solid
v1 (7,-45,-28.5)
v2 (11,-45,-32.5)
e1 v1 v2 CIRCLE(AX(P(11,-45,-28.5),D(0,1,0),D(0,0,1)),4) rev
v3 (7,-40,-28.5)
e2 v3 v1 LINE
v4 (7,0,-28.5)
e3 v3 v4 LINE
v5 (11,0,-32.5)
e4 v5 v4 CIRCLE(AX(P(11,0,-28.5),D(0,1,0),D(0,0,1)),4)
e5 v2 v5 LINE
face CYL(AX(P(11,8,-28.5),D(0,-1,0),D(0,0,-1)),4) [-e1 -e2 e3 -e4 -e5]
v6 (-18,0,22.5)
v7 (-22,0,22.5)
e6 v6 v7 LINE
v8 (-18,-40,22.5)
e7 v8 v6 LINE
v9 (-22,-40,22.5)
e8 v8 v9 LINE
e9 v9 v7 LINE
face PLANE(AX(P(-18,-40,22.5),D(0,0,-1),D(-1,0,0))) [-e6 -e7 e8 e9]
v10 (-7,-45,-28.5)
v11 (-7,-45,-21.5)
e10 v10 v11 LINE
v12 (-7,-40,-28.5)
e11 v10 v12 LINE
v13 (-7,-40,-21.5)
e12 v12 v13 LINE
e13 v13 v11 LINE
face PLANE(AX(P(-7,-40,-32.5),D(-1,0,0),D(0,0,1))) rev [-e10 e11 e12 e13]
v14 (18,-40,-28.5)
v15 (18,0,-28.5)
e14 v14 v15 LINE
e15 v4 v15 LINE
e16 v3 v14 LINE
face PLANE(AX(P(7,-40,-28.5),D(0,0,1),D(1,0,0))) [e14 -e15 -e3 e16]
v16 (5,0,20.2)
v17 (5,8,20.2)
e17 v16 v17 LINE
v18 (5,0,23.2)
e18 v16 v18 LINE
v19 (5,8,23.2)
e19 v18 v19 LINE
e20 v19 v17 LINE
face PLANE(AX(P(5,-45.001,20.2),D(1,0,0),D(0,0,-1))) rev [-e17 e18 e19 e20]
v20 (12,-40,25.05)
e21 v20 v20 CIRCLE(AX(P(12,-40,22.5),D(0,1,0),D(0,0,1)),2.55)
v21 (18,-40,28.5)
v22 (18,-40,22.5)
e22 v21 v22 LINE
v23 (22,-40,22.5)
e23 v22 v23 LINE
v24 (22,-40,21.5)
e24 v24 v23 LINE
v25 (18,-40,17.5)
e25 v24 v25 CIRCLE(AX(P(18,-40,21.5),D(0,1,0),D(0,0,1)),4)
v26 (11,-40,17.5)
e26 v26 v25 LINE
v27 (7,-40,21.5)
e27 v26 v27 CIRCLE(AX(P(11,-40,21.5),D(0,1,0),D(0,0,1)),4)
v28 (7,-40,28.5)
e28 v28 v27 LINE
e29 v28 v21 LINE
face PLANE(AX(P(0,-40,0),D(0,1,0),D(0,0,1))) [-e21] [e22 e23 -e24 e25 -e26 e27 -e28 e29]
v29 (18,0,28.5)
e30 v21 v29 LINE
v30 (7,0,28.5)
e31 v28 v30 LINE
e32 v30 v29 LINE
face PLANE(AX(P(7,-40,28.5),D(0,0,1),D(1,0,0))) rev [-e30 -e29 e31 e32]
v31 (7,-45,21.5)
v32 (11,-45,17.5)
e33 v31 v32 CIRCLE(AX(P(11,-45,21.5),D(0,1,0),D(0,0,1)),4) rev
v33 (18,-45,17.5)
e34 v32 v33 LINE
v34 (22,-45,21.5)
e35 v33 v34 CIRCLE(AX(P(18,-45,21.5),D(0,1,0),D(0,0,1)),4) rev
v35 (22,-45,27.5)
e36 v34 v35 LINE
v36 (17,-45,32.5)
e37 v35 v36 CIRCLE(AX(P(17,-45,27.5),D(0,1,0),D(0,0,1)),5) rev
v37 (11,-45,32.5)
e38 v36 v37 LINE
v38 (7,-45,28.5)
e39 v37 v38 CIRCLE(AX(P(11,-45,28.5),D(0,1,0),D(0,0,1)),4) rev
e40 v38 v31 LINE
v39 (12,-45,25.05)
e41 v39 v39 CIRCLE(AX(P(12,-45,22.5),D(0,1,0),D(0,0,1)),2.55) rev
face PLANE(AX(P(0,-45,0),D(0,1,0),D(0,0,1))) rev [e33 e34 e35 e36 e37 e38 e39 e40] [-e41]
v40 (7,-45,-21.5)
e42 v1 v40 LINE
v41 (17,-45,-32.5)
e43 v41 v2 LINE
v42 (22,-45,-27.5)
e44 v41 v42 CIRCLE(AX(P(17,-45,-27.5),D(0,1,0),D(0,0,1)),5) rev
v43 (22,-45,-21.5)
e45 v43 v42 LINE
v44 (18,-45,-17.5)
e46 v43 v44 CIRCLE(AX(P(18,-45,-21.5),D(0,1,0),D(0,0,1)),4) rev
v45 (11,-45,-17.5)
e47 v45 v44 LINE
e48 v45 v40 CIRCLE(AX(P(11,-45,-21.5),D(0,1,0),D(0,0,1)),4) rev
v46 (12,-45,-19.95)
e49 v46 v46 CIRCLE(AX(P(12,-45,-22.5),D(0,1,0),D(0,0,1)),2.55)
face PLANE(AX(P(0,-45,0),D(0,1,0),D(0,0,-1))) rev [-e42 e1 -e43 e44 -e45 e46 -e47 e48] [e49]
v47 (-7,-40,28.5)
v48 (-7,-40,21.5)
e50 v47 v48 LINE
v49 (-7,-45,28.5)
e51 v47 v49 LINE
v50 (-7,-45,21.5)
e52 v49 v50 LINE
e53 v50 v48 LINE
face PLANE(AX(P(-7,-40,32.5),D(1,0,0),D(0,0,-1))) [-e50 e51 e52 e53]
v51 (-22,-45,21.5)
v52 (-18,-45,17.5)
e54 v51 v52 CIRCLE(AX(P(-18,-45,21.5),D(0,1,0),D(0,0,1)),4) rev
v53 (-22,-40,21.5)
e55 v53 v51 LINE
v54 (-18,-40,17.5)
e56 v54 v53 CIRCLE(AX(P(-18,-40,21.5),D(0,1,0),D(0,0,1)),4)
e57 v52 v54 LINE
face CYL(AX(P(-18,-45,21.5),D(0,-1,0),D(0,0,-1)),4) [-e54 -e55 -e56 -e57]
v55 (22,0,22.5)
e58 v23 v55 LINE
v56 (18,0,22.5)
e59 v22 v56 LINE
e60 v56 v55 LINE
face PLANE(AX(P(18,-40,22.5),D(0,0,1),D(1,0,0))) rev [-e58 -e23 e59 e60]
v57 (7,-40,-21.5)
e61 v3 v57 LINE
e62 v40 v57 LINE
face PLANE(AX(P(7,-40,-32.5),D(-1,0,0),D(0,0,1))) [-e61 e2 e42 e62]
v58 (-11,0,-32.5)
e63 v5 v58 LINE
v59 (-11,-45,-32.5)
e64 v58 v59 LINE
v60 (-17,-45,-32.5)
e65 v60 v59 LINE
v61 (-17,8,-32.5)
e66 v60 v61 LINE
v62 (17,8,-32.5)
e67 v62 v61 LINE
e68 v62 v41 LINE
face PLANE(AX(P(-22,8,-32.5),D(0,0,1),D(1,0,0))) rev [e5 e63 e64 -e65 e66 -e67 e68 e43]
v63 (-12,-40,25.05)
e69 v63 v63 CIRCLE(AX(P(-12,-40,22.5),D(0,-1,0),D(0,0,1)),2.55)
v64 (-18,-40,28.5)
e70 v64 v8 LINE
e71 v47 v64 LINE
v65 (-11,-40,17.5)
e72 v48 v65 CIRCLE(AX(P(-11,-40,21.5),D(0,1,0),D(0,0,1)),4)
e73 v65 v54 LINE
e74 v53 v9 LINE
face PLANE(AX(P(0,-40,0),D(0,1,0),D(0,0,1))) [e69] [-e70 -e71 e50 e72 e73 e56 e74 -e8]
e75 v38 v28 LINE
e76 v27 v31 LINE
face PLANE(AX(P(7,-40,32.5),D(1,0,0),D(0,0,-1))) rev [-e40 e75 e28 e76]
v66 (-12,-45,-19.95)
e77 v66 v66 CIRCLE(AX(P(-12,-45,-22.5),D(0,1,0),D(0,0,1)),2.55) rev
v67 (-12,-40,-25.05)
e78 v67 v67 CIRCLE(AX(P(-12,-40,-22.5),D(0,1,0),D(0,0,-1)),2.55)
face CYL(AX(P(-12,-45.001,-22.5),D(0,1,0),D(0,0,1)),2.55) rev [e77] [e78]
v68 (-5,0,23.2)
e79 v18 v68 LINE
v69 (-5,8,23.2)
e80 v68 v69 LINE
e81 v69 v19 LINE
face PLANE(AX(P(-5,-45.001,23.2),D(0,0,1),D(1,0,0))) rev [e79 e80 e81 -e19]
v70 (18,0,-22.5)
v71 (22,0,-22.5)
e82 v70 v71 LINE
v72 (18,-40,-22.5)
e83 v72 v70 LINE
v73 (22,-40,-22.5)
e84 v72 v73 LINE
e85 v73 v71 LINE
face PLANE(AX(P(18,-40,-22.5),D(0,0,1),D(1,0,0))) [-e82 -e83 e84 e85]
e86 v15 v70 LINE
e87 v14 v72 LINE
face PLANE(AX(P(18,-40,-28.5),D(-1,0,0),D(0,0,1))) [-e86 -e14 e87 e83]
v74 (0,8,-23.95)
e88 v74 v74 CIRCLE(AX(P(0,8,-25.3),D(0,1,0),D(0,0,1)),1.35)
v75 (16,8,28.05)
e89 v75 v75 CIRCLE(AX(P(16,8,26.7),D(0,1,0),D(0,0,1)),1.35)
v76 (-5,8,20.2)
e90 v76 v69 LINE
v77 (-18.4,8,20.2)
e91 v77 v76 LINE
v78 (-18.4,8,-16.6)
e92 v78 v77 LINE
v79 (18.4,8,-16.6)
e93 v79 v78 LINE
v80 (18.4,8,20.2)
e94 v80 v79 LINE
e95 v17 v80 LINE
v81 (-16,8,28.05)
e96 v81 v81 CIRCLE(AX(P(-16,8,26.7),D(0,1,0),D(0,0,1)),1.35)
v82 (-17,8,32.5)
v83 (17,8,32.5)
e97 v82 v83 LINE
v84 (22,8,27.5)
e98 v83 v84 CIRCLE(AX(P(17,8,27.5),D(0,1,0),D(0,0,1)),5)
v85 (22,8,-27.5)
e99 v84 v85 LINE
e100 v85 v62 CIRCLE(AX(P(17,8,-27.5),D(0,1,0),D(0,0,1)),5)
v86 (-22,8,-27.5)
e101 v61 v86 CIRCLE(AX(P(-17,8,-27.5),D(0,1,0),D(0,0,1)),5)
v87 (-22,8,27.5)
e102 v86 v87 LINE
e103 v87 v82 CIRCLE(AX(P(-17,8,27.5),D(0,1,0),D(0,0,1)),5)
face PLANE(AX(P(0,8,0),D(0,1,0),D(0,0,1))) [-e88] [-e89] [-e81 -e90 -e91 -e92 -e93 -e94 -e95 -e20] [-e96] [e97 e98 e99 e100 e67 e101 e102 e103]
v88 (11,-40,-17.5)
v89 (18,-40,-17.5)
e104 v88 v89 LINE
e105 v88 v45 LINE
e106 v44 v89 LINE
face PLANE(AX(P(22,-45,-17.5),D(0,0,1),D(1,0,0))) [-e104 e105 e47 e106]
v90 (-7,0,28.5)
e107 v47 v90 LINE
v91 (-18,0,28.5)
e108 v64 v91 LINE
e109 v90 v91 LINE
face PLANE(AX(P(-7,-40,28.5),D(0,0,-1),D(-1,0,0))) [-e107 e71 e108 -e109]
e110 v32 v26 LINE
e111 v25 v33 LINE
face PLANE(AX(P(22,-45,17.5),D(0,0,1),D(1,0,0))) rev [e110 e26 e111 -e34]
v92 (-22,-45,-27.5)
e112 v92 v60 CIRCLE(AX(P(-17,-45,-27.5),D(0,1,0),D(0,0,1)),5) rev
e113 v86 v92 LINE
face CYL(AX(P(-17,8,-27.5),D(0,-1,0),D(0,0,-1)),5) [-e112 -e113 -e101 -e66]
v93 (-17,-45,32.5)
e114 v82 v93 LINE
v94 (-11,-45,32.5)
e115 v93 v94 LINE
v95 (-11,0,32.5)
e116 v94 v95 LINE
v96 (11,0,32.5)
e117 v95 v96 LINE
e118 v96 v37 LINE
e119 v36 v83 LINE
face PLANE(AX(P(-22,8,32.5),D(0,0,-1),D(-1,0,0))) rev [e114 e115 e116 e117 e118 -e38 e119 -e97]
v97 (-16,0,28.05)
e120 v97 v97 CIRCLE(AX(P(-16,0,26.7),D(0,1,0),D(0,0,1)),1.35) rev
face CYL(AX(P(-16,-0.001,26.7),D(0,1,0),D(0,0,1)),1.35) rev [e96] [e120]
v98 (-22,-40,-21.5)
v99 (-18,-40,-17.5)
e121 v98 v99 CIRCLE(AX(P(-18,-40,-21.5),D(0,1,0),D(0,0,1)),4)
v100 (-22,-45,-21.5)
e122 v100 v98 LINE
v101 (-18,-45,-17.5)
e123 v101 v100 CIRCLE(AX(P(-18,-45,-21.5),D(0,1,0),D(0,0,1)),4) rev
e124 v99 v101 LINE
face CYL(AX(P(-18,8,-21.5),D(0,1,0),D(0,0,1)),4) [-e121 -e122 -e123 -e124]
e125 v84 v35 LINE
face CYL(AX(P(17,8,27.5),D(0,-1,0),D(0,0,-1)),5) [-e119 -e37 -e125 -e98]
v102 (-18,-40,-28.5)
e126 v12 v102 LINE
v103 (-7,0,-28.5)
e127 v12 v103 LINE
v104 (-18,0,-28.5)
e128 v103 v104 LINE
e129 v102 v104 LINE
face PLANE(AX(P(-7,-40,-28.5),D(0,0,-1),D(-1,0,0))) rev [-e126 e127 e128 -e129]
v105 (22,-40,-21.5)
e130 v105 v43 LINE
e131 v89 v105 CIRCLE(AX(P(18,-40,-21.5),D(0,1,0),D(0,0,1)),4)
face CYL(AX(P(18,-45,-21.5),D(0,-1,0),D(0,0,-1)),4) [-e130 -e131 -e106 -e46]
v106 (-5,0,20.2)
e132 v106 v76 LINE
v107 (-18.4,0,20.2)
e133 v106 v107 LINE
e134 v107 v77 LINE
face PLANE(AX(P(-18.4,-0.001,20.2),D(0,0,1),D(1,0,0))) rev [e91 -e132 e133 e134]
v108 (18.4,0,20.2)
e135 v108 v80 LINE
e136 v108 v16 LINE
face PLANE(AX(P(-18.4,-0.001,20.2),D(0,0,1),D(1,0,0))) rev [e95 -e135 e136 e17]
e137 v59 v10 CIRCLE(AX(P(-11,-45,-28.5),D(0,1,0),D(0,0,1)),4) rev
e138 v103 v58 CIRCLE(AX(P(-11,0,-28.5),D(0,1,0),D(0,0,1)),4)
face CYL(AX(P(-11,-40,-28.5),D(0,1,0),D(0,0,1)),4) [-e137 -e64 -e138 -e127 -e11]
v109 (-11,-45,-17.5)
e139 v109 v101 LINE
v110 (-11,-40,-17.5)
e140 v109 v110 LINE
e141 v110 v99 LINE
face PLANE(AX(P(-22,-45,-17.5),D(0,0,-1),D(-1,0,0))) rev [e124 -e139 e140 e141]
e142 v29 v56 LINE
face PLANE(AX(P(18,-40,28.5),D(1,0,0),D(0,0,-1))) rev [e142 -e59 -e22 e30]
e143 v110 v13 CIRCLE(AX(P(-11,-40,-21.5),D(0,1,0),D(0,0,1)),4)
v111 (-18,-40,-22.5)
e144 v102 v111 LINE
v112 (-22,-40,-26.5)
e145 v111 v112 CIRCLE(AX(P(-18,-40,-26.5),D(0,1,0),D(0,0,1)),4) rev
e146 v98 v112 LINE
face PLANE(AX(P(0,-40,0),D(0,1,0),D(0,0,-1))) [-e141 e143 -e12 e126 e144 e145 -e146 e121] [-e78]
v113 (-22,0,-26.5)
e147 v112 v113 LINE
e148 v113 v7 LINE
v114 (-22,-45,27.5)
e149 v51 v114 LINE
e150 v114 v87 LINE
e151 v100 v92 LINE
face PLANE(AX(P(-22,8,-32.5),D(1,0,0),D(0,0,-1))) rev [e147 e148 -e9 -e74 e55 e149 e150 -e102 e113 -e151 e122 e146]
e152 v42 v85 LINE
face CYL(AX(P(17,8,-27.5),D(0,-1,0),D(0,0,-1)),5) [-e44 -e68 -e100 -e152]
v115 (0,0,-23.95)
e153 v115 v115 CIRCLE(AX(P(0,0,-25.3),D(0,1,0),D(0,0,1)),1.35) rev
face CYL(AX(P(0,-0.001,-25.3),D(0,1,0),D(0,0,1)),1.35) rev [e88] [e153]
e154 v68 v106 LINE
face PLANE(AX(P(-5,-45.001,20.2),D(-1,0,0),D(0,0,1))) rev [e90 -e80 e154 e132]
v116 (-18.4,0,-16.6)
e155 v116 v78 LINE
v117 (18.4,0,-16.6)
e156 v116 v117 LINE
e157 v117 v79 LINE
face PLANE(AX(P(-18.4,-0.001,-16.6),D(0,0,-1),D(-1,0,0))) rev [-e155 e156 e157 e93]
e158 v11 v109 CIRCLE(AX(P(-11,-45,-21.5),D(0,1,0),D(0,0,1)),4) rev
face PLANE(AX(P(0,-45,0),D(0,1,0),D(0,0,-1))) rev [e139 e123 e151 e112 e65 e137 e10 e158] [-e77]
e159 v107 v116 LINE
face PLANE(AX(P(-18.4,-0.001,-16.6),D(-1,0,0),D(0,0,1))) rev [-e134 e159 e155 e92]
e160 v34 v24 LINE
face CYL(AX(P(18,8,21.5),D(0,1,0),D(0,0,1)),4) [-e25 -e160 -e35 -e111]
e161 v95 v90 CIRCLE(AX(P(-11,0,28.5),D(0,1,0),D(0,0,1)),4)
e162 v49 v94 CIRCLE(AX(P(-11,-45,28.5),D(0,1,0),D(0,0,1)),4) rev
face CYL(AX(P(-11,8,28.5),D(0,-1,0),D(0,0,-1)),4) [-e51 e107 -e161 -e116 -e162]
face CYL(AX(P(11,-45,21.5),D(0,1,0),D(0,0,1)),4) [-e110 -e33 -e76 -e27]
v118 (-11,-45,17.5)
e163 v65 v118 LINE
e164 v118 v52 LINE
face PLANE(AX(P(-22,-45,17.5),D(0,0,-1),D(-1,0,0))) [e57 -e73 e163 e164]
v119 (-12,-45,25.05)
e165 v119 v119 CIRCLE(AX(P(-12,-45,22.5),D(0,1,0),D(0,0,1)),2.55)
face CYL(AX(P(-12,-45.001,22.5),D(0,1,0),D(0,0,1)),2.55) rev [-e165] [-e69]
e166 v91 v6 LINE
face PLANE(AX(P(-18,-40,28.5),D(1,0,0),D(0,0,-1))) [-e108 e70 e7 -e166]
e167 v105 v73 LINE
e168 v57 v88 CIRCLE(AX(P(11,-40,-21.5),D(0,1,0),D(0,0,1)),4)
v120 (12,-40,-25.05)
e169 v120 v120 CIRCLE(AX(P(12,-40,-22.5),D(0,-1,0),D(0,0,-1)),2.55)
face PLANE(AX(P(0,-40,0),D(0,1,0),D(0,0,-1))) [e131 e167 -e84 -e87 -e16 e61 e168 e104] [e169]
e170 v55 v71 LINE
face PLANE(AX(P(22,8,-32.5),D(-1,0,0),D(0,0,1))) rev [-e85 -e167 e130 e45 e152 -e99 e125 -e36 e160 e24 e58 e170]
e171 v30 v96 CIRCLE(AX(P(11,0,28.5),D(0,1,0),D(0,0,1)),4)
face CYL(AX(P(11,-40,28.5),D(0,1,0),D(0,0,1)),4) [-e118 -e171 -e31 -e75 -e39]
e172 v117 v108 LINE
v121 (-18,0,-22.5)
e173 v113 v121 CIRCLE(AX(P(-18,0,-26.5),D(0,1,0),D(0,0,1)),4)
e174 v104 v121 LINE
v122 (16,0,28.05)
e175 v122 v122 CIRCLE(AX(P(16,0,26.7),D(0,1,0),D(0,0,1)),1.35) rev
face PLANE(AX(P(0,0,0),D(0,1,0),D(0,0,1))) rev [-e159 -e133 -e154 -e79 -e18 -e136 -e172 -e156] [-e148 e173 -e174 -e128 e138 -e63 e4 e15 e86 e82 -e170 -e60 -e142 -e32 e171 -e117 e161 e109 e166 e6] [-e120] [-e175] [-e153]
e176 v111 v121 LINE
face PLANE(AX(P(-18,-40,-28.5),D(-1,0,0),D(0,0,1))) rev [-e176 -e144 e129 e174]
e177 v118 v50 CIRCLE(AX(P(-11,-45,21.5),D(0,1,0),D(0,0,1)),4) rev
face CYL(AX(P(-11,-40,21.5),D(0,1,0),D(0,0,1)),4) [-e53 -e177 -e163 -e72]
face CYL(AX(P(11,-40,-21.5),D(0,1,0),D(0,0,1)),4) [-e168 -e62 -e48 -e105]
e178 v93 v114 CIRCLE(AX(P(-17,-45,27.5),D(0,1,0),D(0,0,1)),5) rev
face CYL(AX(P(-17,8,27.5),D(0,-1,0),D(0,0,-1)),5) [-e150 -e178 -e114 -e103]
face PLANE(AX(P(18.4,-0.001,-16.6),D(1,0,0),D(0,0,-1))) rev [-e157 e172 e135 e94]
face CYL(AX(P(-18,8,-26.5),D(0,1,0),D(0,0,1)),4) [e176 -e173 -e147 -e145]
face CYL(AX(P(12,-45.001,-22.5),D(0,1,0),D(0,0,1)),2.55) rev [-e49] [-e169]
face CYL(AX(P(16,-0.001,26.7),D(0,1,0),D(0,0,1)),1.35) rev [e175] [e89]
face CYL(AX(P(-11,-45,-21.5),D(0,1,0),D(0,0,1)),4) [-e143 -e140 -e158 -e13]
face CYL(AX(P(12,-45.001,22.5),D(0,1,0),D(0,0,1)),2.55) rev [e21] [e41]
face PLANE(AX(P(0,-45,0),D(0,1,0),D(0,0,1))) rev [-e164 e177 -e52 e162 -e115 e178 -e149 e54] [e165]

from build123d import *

# Parameters (mm, degrees)
SKETCH1_W               = 44
SKETCH1_H               = 65
BOSS_EXTRUDE1_DEPTH     = 8
CUT_EXTRUDE1_REACH      = 42.053
SKETCH2_W               = 36.8
SKETCH2_H               = 36.8
CUT_EXTRUDE2_REACH      = 42.053
SKETCH3_R               = 1.35
BOSS_EXTRUDE2_DEPTH     = 40
SKETCH6_W               = 15
SKETCH6_H               = 15
BOSS_EXTRUDE3_DEPTH     = 5
CUT_EXTRUDE3_REACH      = 64.002
SKETCH7_R               = 2.55
MIRROR2_COPY_1_DEPTH    = 40
MIRROR2_COPY_2_SKETCH_W = 15
MIRROR2_COPY_2_SKETCH_H = 15
MIRROR2_COPY_2_DEPTH    = 5
MIRROR2_COPY_3_REACH    = 64.002
MIRROR2_COPY_3_SKETCH_R = 2.55
CUT_EXTRUDE4_REACH      = 67.949
SKETCH8_W               = 10
SKETCH8_H               = 3
FILLET1_R               = 4
FILLET2_R               = 5


with BuildPart() as part:
    # Sketch1 → Boss-Extrude1 (new body)
    with BuildSketch(Plane(origin=(0, 0, 0), x_dir=(1, 0, 0), z_dir=(0, 1, 0))):
        Rectangle(SKETCH1_W, SKETCH1_H)
    extrude(amount=BOSS_EXTRUDE1_DEPTH)

    # Sketch2 → Cut-Extrude1 (cut, up to next)
    with BuildSketch(Plane(origin=(0, 8, 0), x_dir=(1, 0, 0), z_dir=(0, 1, 0)), mode=Mode.PRIVATE) as cut_extrude1_sk1:
        with Locations((0, -1.8)):
            Rectangle(SKETCH2_W, SKETCH2_H)
    cut_extrude1_tool1 = extrude(cut_extrude1_sk1.sketch, amount=-CUT_EXTRUDE1_REACH, mode=Mode.PRIVATE) & part.part
    add(cut_extrude1_tool1.solids().sort_by_distance((0, 8, 1.8))[0], mode=Mode.SUBTRACT)

    # Sketch3 → Cut-Extrude2 (cut, up to next)
    with BuildSketch(Plane(origin=(0, 8, 0), x_dir=(1, 0, 0), z_dir=(0, 1, 0)), mode=Mode.PRIVATE) as cut_extrude2_sk1:
        with Locations(Location((-16, -26.7, 0), (0, 0, 270))):
            Circle(SKETCH3_R)
    cut_extrude2_tool1 = extrude(cut_extrude2_sk1.sketch, amount=-CUT_EXTRUDE2_REACH, mode=Mode.PRIVATE) & part.part
    # Sketch3 → Cut-Extrude2 (cut, up to next)
    with BuildSketch(Plane(origin=(0, 8, 0), x_dir=(1, 0, 0), z_dir=(0, 1, 0)), mode=Mode.PRIVATE) as cut_extrude2_sk2:
        with Locations(Location((16, -26.7, 0), (0, 0, 270))):
            Circle(SKETCH3_R)
    cut_extrude2_tool2 = extrude(cut_extrude2_sk2.sketch, amount=-CUT_EXTRUDE2_REACH, mode=Mode.PRIVATE) & part.part
    # Sketch3 → Cut-Extrude2 (cut, up to next)
    with BuildSketch(Plane(origin=(0, 8, 0), x_dir=(1, 0, 0), z_dir=(0, 1, 0)), mode=Mode.PRIVATE) as cut_extrude2_sk3:
        with Locations(Location((0, 25.3, 0), (0, 0, 270))):
            Circle(SKETCH3_R)
    cut_extrude2_tool3 = extrude(cut_extrude2_sk3.sketch, amount=-CUT_EXTRUDE2_REACH, mode=Mode.PRIVATE) & part.part
    add(cut_extrude2_tool1.solids().sort_by_distance((-16, 8, 26.7))[0], mode=Mode.SUBTRACT)
    add(cut_extrude2_tool2.solids().sort_by_distance((16, 8, 26.7))[0], mode=Mode.SUBTRACT)
    add(cut_extrude2_tool3.solids().sort_by_distance((0, 8, -25.3))[0], mode=Mode.SUBTRACT)

    # Sketch5 → Boss-Extrude2 (add)
    with BuildSketch(Plane.XZ):
        Polygon((22, 32.5), (7, 32.5), (7, 28.5), (18, 28.5), (18, 22.5), (22, 22.5), align=None)
    boss_extrude2 = extrude(amount=BOSS_EXTRUDE2_DEPTH)

    # Sketch6 → Boss-Extrude3 (add)
    with BuildSketch(Plane.XZ.offset(40)):
        with Locations((14.5, 25)):
            Rectangle(SKETCH6_W, SKETCH6_H)
    boss_extrude3 = extrude(amount=BOSS_EXTRUDE3_DEPTH)

    # Sketch7 → Cut-Extrude3 (cut, up to next)
    with BuildSketch(Plane(origin=(0, -40, 0), x_dir=(1, 0, 0), z_dir=(0, 1, 0)), mode=Mode.PRIVATE) as cut_extrude3_sk1:
        with Locations(Location((12, -22.5, 0), (0, 0, 270))):
            Circle(SKETCH7_R)
    cut_extrude3_tool1 = extrude(cut_extrude3_sk1.sketch, amount=-CUT_EXTRUDE3_REACH, mode=Mode.PRIVATE) & part.part
    cut_extrude3 = cut_extrude3_tool1.solids().sort_by_distance((12, -40, 22.5))[0]
    add(cut_extrude3, mode=Mode.SUBTRACT)

    # Mirror1: Boss-Extrude2, Boss-Extrude3, Cut-Extrude3 across plane
    add(boss_extrude2.mirror(Plane(origin=(0, 0, 0), x_dir=(0, 0, 1), z_dir=(1, 0, 0))))
    add(boss_extrude3.mirror(Plane(origin=(0, 0, 0), x_dir=(0, 0, 1), z_dir=(1, 0, 0))))
    add(cut_extrude3.mirror(Plane(origin=(0, 0, 0), x_dir=(0, 0, 1), z_dir=(1, 0, 0))), mode=Mode.SUBTRACT)

    # Mirror2: Boss-Extrude2, Boss-Extrude3, Cut-Extrude3 across plane
    add(boss_extrude2.mirror(Plane.XY))
    add(boss_extrude3.mirror(Plane.XY))
    add(cut_extrude3.mirror(Plane.XY), mode=Mode.SUBTRACT)

    # Mirror2 copy 1 sketch → Mirror2 copy 1 (add)
    with BuildSketch(Plane(origin=(0, 0, 0), x_dir=(-1, 0, 0), z_dir=(0, -1, 0))):
        Polygon((22, 32.5), (7, 32.5), (7, 28.5), (18, 28.5), (18, 22.5), (22, 22.5), align=None)
    extrude(amount=MIRROR2_COPY_1_DEPTH)

    # Mirror2 copy 2 sketch → Mirror2 copy 2 (add)
    with BuildSketch(Plane(origin=(0, -40, 0), x_dir=(-1, 0, 0), z_dir=(0, -1, 0))):
        with Locations((14.5, 25)):
            Rectangle(MIRROR2_COPY_2_SKETCH_W, MIRROR2_COPY_2_SKETCH_H)
    extrude(amount=MIRROR2_COPY_2_DEPTH)

    # Mirror2 copy 3 sketch → Mirror2 copy 3 (cut, up to next)
    with BuildSketch(Plane(origin=(0, -40, 0), x_dir=(-1, 0, 0), z_dir=(0, 1, 0)), mode=Mode.PRIVATE) as mirror2_copy_3_sk1:
        with Locations(Location((12, -22.5, 0), (0, 0, 270))):
            Circle(MIRROR2_COPY_3_SKETCH_R)
    mirror2_copy_3_tool1 = extrude(mirror2_copy_3_sk1.sketch, amount=-MIRROR2_COPY_3_REACH, mode=Mode.PRIVATE) & part.part
    add(mirror2_copy_3_tool1.solids().sort_by_distance((-12, -40, -22.5))[0], mode=Mode.SUBTRACT)

    # Sketch8 → Cut-Extrude4 (cut, up to next)
    with BuildSketch(Plane(origin=(0, 8, 0), x_dir=(1, 0, 0), z_dir=(0, 1, 0)), mode=Mode.PRIVATE) as cut_extrude4_sk1:
        with Locations((0, -21.7)):
            Rectangle(SKETCH8_W, SKETCH8_H)
    cut_extrude4_tool1 = extrude(cut_extrude4_sk1.sketch, amount=-CUT_EXTRUDE4_REACH, mode=Mode.PRIVATE) & part.part
    add(cut_extrude4_tool1.solids().sort_by_distance((0, 8, 21.7))[0], mode=Mode.SUBTRACT)

    # Fillet1
    fillet1_edges = [part.edges().sort_by_distance(p)[0] for p in [
        (7, -22.5, -32.5),
        (22, -42.5, -17.5),
        (7, -42.5, -17.5),
        (-22, -20, -22.5),
        (-7, -22.5, -32.5),
        (-22, -42.5, -17.5),
        (-7, -42.5, -17.5),
        (7, -22.5, 32.5),
        (22, -42.5, 17.5),
        (7, -42.5, 17.5),
        (-7, -22.5, 32.5),
        (-22, -42.5, 17.5),
        (-7, -42.5, 17.5),
    ]]
    fillet(fillet1_edges, radius=FILLET1_R - 0.0001)  # a hair under: the kernel refuses the full size

    # Fillet2
    fillet2_edges = [part.edges().sort_by_distance(p)[0] for p in [
        (-22, -18.5, -32.5),
        (22, -18.5, -32.5),
        (22, -18.5, 32.5),
        (-22, -18.5, 32.5),
    ]]
    fillet(fillet2_edges, radius=FILLET2_R)


solid = part.part
